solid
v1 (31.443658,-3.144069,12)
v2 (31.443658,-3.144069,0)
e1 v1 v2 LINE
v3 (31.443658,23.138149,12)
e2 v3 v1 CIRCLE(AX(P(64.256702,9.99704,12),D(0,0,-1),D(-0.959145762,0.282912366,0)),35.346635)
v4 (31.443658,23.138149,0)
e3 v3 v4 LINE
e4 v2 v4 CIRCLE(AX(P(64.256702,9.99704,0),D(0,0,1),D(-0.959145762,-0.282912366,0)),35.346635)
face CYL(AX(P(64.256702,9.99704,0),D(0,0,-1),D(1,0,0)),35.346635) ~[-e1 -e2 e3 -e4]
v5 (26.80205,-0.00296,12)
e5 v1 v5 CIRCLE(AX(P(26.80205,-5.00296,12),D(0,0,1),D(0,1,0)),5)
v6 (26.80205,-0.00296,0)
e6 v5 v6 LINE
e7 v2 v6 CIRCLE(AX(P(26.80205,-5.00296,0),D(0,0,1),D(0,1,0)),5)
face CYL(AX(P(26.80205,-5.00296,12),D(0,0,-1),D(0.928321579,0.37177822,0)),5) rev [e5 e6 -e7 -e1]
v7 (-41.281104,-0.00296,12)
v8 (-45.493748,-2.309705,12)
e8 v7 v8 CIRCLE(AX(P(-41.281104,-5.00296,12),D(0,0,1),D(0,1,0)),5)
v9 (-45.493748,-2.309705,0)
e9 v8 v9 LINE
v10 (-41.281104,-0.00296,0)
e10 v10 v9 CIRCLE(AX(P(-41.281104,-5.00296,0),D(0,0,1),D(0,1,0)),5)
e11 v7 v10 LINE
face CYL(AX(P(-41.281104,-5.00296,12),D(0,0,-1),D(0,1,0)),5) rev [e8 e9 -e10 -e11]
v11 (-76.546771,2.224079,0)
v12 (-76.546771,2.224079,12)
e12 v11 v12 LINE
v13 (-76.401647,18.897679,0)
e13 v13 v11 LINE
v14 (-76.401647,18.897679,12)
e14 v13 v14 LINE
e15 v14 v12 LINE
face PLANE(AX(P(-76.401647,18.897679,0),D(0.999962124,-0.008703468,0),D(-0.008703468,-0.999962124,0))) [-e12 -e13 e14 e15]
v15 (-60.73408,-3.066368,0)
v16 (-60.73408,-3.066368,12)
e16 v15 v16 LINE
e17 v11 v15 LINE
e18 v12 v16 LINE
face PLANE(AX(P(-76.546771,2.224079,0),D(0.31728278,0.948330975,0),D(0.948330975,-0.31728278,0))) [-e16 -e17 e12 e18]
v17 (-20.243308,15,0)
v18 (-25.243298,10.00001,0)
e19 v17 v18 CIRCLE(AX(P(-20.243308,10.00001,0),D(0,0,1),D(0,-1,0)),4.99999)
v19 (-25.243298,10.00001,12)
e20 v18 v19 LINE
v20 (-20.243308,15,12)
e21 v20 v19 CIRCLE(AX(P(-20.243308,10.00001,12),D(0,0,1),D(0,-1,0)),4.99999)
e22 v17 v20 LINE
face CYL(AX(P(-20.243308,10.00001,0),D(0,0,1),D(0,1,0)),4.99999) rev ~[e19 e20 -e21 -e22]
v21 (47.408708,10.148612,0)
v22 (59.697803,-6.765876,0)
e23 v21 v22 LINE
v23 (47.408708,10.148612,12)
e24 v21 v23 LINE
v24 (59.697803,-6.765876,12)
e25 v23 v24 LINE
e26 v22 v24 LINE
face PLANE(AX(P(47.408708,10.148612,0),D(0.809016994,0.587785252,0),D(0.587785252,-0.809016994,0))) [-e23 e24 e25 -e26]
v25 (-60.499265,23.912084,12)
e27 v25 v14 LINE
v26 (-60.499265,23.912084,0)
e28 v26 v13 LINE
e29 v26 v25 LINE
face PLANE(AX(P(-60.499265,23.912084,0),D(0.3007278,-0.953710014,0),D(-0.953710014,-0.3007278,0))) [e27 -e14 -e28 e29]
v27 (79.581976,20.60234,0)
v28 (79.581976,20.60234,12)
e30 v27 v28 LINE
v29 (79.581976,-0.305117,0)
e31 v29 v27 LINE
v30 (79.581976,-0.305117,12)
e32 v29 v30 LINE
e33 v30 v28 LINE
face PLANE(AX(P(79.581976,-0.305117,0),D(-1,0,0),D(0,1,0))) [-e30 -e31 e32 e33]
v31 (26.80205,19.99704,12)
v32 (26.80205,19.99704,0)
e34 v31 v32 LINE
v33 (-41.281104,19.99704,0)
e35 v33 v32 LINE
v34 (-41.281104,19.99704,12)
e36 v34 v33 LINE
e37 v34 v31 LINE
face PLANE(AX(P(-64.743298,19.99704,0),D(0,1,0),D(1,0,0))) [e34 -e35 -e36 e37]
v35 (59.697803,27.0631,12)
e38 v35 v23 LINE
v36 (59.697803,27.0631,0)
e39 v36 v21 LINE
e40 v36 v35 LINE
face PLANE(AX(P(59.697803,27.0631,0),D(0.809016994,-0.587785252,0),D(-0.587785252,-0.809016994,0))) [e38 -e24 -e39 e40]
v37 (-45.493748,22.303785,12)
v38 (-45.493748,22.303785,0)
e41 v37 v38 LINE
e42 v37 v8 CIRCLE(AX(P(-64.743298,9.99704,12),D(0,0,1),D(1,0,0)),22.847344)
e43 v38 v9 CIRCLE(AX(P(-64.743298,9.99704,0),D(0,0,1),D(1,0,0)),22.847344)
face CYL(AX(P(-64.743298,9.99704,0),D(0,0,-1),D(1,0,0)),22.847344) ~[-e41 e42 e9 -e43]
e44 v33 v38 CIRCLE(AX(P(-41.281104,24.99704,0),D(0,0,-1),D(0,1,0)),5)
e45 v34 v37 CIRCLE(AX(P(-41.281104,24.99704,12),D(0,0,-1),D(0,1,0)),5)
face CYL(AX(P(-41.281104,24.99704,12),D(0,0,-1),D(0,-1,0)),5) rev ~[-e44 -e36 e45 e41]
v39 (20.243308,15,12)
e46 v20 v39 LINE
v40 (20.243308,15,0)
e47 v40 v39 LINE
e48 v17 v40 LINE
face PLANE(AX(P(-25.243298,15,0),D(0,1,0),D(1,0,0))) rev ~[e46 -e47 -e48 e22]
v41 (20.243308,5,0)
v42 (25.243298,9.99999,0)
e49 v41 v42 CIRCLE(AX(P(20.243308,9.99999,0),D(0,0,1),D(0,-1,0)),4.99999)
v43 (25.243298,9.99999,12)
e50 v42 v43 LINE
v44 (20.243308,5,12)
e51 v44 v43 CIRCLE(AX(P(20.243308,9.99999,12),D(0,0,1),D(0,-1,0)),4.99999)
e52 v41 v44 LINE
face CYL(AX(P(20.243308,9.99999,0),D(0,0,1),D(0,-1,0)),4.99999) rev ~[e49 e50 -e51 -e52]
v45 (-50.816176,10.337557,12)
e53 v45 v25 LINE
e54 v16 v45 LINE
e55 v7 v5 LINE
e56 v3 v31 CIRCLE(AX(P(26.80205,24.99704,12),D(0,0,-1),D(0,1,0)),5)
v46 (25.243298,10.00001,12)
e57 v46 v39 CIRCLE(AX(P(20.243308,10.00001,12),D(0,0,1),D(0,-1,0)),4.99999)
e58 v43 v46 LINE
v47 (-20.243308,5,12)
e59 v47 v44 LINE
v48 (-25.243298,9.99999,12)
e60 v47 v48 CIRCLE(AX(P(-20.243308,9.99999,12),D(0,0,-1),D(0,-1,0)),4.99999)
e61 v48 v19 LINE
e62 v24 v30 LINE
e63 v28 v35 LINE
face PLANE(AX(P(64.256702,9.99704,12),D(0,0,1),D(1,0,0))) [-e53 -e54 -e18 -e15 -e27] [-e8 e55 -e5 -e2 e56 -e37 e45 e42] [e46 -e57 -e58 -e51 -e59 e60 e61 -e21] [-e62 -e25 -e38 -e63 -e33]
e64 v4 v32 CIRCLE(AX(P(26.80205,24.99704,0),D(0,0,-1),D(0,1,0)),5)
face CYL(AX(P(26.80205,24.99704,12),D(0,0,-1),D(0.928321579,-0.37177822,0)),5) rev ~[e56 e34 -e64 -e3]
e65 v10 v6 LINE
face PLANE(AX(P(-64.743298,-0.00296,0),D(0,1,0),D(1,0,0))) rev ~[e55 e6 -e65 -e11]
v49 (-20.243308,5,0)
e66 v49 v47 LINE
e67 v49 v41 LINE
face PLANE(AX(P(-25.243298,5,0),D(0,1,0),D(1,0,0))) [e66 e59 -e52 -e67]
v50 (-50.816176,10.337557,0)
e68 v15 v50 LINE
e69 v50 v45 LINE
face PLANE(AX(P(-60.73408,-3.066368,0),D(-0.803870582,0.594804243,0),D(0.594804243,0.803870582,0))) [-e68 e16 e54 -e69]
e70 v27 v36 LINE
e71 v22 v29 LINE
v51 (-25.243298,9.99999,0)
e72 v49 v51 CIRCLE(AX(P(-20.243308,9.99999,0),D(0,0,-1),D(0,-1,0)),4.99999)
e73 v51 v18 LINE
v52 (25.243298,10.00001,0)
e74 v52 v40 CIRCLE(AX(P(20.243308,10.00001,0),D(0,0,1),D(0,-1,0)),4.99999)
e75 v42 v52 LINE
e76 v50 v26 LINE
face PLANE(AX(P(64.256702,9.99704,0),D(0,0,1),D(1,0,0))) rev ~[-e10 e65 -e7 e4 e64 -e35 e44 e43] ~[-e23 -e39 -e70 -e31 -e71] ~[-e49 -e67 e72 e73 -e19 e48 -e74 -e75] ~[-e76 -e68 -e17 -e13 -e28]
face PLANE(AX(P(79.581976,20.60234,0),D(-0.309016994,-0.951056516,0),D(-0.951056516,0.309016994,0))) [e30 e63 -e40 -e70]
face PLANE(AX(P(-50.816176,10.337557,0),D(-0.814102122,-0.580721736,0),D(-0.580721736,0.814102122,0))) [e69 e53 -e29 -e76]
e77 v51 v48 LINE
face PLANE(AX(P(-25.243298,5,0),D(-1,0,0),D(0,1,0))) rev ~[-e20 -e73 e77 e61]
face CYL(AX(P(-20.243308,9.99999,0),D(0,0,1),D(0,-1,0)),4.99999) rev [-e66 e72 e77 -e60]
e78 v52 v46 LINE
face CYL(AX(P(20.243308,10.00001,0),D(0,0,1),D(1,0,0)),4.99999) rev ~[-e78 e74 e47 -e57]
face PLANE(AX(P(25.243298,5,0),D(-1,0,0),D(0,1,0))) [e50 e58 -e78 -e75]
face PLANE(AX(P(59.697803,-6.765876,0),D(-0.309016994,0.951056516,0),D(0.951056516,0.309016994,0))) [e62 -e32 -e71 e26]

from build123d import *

# Parameters (mm, degrees)
F0_W      = 129
F0_H      = 20
F1_DEPTH  = 12
F2_R      = 22.8473442097
F4_DEPTH  = 12
F3_R      = 35.3466345688
F5_DEPTH  = 12
F6_W      = 50.4865964812
F6_H      = 10
F7_DEPTH  = 12
F8_DEPTH  = 12
F9_R      = 4.99999
F11_DEPTH = 12
F13_DEPTH = 12
F14_R     = 5


# Not quite as in the source:
# - a fillet or chamfer is up to 0.001 mm smaller than in the source, because OpenCascade refuses the exact size


with BuildPart() as f1:
    # F0 (on Top) → F1 (new body)
    with BuildSketch(Plane.XY):
        with Locations((-0.2432982406, 9.9970398602)):
            Rectangle(F0_W, F0_H)
    extrude(amount=F1_DEPTH)

    # F2 (on Top) → F4 (join)
    with BuildSketch(Plane.XY):
        with Locations((-64.7432982406, 9.9970398602)):
            Circle(F2_R)
    extrude(amount=F4_DEPTH)

    # F3 (on Top) → F5 (join)
    with BuildSketch(Plane.XY):
        with Locations((64.2567017594, 9.9970398602)):
            Circle(F3_R)
    extrude(amount=F5_DEPTH)

    # F6 (on Top) → F7 (join)
    with BuildSketch(Plane.XY):
        with Locations((0, 10)):
            Rectangle(F6_W, F6_H)
    extrude(amount=F7_DEPTH)

    # F6 (on Top) → F8 (cut)
    with BuildSketch(Plane.XY):
        with Locations((0, 10)):
            Rectangle(F6_W, F6_H)
    extrude(amount=F8_DEPTH, mode=Mode.SUBTRACT)

    # F9 (radius 5 in the source; OpenCascade refuses exactly that, so slightly less here)
    f9_edges = [f1.edges().sort_by_distance(p)[0] for p in [
        (-25.243298, 15, 6),
        (25.243298, 15, 6),
        (25.243298, 5, 6),
        (-25.243298, 5, 6),
    ]]
    fillet(f9_edges, radius=F9_R)

    # F10 (on face) → F11 (cut)
    with BuildSketch(Plane.XY):
        Polygon((-60.7340801705, -3.0663675243), (-50.8161764394, 10.3375567669), (-60.499265179, 23.9120841357), (-76.4016468673, 18.8976791396), (-76.5467705132, 2.2240790499), align=None)
    extrude(amount=F11_DEPTH, mode=Mode.SUBTRACT)

    # F12 (on face) → F13 (cut)
    with BuildSketch(Plane.XY):
        Polygon((79.5819759369, -0.3051165918), (79.5819759369, 20.6023402938), (59.6978028267, 27.0630997807), (47.4087080063, 10.148611851), (59.6978028267, -6.7658760786), align=None)
    extrude(amount=F13_DEPTH, mode=Mode.SUBTRACT)

    # F14
    f14_edges = [f1.edges().sort_by_distance(p)[0] for p in [
        (-44.200632, -0.00296, 6),
        (30.354127, -0.00296, 6),
        (30.354127, 19.99704, 6),
        (-44.200632, 19.99704, 6),
    ]]
    fillet(f14_edges, radius=F14_R)


solid = f1.part
